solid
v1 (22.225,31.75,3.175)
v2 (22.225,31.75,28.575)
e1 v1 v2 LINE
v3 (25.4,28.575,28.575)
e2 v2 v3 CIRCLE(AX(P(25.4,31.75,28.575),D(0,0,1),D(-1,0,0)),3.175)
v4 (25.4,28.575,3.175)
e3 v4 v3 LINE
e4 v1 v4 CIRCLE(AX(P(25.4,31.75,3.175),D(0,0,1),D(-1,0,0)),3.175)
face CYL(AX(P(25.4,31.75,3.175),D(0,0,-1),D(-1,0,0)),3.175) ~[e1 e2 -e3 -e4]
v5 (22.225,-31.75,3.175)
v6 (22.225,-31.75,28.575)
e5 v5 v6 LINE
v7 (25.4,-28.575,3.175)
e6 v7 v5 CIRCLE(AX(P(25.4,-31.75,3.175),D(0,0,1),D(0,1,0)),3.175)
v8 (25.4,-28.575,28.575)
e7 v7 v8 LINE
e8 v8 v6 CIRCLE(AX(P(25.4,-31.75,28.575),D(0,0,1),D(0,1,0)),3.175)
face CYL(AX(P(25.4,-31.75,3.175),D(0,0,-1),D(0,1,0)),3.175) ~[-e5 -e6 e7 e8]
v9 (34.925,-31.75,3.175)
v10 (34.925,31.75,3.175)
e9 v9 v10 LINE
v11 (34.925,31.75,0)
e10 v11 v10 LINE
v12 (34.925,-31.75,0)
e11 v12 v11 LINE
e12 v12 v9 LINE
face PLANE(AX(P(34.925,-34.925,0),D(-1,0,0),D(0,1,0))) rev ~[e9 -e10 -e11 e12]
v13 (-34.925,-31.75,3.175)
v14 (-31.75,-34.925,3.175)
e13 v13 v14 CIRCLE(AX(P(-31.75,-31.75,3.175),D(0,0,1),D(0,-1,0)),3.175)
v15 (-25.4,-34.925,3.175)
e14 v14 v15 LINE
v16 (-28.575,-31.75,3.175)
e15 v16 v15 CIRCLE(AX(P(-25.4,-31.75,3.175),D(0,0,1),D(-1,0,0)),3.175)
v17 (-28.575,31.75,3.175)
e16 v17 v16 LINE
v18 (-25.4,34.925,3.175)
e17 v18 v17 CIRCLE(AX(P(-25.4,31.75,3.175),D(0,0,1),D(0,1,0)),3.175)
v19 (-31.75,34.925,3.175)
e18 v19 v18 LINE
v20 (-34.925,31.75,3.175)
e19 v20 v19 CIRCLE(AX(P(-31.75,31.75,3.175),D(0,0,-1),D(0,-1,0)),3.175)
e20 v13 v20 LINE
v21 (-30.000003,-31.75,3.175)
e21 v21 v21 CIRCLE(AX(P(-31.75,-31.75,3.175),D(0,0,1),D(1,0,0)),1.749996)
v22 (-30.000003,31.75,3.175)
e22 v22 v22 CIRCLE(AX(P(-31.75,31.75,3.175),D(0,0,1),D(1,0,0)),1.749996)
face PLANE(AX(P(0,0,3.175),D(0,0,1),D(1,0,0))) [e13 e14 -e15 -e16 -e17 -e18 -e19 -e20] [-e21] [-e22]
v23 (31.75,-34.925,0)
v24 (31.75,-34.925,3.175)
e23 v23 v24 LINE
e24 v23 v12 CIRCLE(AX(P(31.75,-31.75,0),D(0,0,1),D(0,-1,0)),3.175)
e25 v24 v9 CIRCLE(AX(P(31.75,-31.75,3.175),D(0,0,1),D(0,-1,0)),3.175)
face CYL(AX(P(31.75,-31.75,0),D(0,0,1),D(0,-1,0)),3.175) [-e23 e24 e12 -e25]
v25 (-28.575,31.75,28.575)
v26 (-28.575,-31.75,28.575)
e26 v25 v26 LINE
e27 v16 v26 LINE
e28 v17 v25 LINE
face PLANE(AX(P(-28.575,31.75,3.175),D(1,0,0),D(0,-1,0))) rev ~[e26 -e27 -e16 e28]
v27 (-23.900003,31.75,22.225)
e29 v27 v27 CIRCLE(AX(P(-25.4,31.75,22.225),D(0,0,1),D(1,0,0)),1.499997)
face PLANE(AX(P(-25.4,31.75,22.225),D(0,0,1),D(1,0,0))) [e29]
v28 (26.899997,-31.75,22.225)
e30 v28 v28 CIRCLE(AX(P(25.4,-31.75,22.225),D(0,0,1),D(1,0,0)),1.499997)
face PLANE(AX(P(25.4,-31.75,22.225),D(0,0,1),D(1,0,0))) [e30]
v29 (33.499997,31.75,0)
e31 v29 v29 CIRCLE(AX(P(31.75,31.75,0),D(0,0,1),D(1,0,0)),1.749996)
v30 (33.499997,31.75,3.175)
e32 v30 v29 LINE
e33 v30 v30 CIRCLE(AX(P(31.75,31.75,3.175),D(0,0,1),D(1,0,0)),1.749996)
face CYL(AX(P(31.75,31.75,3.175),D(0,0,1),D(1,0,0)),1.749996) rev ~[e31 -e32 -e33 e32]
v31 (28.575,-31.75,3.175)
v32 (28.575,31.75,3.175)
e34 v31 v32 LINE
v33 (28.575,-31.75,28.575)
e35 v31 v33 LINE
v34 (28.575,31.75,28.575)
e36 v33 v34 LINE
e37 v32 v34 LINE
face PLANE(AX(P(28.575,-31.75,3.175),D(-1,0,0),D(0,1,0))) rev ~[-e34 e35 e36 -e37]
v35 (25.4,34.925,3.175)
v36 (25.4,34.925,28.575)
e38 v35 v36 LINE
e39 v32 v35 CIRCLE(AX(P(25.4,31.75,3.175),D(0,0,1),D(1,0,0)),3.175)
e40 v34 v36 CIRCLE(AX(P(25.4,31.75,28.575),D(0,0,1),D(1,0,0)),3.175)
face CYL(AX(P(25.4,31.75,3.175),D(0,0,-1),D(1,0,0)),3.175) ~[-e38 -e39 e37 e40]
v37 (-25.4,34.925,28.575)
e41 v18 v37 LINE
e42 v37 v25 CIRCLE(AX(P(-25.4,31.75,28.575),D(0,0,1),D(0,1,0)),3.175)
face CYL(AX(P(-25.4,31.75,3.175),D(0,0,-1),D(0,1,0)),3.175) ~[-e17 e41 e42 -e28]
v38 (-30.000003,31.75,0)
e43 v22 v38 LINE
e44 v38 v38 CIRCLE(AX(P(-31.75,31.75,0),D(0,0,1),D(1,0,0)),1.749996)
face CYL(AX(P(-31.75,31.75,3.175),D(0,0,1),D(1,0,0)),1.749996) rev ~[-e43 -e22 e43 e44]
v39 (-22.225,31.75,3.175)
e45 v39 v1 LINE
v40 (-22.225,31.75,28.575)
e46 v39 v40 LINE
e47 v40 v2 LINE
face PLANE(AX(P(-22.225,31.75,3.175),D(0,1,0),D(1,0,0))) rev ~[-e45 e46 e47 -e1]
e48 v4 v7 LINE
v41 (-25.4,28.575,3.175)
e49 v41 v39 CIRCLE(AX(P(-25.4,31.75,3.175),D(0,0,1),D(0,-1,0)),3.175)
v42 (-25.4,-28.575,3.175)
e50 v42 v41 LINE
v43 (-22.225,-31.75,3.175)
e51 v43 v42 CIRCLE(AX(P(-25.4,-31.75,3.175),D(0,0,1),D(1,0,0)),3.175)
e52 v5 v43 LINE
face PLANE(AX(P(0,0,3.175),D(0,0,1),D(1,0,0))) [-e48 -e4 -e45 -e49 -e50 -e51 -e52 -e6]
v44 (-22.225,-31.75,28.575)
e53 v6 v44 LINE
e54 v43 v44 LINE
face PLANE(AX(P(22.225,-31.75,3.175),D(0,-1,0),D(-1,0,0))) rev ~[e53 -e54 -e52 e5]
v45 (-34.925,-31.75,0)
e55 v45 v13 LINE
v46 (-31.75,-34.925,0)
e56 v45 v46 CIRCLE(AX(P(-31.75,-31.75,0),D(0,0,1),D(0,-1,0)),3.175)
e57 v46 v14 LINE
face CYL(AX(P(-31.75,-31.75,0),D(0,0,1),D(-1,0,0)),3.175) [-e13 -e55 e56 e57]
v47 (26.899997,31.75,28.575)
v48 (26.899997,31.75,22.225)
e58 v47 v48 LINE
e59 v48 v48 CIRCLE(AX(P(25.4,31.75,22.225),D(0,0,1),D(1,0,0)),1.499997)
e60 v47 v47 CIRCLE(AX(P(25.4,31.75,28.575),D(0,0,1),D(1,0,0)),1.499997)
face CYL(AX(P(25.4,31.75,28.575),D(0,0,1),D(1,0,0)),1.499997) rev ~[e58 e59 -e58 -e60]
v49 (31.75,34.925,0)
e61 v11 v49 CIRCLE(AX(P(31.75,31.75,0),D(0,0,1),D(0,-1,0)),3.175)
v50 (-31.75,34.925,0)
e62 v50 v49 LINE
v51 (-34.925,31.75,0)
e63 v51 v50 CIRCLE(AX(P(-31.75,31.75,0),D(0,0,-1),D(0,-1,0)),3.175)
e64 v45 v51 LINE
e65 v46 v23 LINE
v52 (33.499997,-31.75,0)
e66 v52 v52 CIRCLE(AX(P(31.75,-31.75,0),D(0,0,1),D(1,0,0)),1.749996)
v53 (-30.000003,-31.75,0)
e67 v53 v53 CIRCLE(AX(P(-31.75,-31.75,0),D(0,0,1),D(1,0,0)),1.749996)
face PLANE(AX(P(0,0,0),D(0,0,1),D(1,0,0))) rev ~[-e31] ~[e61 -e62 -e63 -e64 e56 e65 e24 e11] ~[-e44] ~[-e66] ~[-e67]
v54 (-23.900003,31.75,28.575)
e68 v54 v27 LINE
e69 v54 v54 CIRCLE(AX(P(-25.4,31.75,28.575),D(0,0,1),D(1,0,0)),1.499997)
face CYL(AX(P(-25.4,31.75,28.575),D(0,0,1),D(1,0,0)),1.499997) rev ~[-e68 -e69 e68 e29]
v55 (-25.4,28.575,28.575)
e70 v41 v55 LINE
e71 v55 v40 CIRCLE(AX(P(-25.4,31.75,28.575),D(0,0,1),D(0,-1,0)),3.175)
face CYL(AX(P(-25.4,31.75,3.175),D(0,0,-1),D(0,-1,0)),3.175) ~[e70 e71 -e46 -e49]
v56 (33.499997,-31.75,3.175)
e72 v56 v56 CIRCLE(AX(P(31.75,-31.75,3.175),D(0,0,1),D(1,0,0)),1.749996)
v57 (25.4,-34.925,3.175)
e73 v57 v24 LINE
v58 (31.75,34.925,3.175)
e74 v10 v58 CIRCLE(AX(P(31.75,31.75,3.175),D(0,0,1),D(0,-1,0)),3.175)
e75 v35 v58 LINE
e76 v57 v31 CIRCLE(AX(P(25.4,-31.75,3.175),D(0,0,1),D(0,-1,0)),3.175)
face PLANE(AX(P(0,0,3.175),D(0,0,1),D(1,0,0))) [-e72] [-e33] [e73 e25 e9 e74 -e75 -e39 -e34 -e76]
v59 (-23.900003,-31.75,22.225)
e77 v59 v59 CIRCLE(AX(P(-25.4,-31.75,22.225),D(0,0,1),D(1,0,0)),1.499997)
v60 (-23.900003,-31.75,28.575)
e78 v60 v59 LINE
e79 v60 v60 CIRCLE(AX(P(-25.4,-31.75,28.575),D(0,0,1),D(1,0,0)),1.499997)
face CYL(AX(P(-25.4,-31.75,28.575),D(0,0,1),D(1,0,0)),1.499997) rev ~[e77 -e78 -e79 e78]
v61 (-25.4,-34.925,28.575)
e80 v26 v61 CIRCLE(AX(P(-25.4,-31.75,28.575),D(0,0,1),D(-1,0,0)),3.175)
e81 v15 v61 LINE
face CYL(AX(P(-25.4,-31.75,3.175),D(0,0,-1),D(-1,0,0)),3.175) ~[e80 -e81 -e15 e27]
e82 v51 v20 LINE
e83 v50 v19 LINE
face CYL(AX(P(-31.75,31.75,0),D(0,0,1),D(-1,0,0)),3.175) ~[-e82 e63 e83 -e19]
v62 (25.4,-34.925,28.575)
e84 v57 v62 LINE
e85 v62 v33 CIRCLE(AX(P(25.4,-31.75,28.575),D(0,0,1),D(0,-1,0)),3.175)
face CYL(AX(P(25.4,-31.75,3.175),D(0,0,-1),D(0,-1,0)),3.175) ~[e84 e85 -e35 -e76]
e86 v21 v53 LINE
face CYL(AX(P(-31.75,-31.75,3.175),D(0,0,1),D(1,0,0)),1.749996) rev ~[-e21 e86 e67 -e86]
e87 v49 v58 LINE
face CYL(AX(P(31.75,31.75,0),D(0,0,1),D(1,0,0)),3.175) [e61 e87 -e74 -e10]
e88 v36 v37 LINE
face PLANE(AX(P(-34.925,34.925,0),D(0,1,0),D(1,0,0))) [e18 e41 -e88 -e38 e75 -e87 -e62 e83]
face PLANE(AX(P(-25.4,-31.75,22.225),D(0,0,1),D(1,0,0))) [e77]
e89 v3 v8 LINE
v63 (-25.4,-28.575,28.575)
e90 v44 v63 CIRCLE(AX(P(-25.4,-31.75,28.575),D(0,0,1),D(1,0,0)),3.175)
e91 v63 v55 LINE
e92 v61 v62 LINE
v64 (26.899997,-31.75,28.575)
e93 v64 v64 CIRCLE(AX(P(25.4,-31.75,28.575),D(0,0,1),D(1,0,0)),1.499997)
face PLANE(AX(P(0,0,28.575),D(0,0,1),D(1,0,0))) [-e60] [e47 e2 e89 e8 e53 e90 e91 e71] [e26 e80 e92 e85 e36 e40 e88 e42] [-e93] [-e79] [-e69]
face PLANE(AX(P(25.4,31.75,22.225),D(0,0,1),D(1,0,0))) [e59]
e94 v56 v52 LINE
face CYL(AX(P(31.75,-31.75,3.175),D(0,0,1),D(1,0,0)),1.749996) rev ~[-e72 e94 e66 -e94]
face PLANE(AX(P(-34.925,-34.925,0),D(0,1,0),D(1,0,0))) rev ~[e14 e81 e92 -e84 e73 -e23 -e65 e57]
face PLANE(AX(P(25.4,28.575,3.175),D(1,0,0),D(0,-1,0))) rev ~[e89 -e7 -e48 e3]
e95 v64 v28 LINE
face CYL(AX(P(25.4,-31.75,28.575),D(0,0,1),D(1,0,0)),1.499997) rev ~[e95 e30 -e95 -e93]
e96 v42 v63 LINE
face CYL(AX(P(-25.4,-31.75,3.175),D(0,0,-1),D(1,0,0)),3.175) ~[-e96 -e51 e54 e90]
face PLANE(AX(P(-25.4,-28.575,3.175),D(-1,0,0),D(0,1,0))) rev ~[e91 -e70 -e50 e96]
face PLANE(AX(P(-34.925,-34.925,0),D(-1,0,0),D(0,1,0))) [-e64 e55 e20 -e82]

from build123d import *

# Parameters (mm, degrees)
F0_W          = 69.85
F0_H          = 69.85
F1_DEPTH      = 3.175
F2_R          = 3.175
F3_R          = 1.7499965
F4_DEPTH      = 25.4
F4_DEPTH_BACK = 101
F6_DEPTH      = 25.4
F7_R          = 1.499997
F8_DEPTH      = 6.35
F10_W         = 44.45
F10_H         = 57.15
F11_DEPTH     = 1.27
F12_W         = 8.9916
F12_H         = 14.4018
F13_DEPTH     = 10.9982


# Not quite as in the source:
# - an extrude ends at something that could not be found from the text; its depth is read off the source's solid


with BuildPart() as f1:
    # F0 (on Top) → F1 (new body)
    with BuildSketch(Plane.XY):
        Rectangle(F0_W, F0_H)
    extrude(amount=F1_DEPTH)

    # F2
    f2_edges = [f1.edges().sort_by_distance(p)[0] for p in [
        (-34.925, -34.925, 1.5875),
        (34.925, -34.925, 1.5875),
        (34.925, 34.925, 1.5875),
        (-34.925, 34.925, 1.5875),
    ]]
    fillet(f2_edges, radius=F2_R)

    # F3 (on face) → F4 (cut, two sides)
    with BuildSketch(Plane.XY.offset(3.175)) as f4_sk:
        with Locations((-31.75, 31.75)):
            Circle(F3_R)
        with Locations((31.75, 31.75)):
            Circle(F3_R)
        with Locations((31.75, -31.75)):
            Circle(F3_R)
        with Locations((-31.75, -31.75)):
            Circle(F3_R)
    extrude(amount=-F4_DEPTH, mode=Mode.SUBTRACT)
    extrude(f4_sk.sketch, amount=F4_DEPTH_BACK, mode=Mode.SUBTRACT)

    # F5 (on face) → F6 (join)
    with BuildSketch(Plane.XY.offset(3.175)):
        with BuildLine():
            Line((25.4, 34.925), (-25.4, 34.925))
            ThreePointArc((-25.4, 34.925), (-27.6450640303, 33.9950640303), (-28.575, 31.75))
            Line((-28.575, 31.75), (-28.575, -31.75))
            ThreePointArc((-28.575, -31.75), (-27.6450640303, -33.9950640303), (-25.4, -34.925))
            Line((-25.4, -34.925), (25.4, -34.925))
            ThreePointArc((25.4, -34.925), (27.6450640303, -33.9950640303), (28.575, -31.75))
            Line((28.575, -31.75), (28.575, 31.75))
            ThreePointArc((28.575, 31.75), (27.6450640303, 33.9950640303), (25.4, 34.925))
        make_face()
        with BuildLine():
            ThreePointArc((-25.4, 28.575), (-23.1549359697, 29.5049359697), (-22.225, 31.75))
            Line((-22.225, 31.75), (22.225, 31.75))
            ThreePointArc((22.225, 31.75), (23.1549359697, 29.5049359697), (25.4, 28.575))
            Line((25.4, 28.575), (25.4, -28.575))
            ThreePointArc((25.4, -28.575), (23.1549359697, -29.5049359697), (22.225, -31.75))
            Line((22.225, -31.75), (-22.225, -31.75))
            ThreePointArc((-22.225, -31.75), (-23.1549359697, -29.5049359697), (-25.4, -28.575))
            Line((-25.4, -28.575), (-25.4, 28.575))
        make_face(mode=Mode.SUBTRACT)
    extrude(amount=F6_DEPTH)

    # F7 (on face) → F8 (cut)
    with BuildSketch(Plane.XY.offset(28.575)):
        with Locations((-25.4, 31.75)):
            Circle(F7_R)
        with Locations((25.4, 31.75)):
            Circle(F7_R)
        with Locations((25.4, -31.75)):
            Circle(F7_R)
        with Locations((-25.4, -31.75)):
            Circle(F7_R)
    extrude(amount=-F8_DEPTH, mode=Mode.SUBTRACT)


with BuildPart() as f11:
    # F10 (on offset) → F11 (new body)
    with BuildSketch(Plane.XY.offset(6.35)):
        with Locations((0.3046067432, 0.0383506862)):
            Rectangle(F10_W, F10_H)
    extrude(amount=F11_DEPTH)

    # F12 (on face) → F13 (join)
    with BuildSketch(Plane.XY.offset(7.62)):
        with Locations((-12.7947921936, -21.3357493138)):
            Rectangle(F12_W, F12_H)
    extrude(amount=F13_DEPTH)


solid = f1.part
